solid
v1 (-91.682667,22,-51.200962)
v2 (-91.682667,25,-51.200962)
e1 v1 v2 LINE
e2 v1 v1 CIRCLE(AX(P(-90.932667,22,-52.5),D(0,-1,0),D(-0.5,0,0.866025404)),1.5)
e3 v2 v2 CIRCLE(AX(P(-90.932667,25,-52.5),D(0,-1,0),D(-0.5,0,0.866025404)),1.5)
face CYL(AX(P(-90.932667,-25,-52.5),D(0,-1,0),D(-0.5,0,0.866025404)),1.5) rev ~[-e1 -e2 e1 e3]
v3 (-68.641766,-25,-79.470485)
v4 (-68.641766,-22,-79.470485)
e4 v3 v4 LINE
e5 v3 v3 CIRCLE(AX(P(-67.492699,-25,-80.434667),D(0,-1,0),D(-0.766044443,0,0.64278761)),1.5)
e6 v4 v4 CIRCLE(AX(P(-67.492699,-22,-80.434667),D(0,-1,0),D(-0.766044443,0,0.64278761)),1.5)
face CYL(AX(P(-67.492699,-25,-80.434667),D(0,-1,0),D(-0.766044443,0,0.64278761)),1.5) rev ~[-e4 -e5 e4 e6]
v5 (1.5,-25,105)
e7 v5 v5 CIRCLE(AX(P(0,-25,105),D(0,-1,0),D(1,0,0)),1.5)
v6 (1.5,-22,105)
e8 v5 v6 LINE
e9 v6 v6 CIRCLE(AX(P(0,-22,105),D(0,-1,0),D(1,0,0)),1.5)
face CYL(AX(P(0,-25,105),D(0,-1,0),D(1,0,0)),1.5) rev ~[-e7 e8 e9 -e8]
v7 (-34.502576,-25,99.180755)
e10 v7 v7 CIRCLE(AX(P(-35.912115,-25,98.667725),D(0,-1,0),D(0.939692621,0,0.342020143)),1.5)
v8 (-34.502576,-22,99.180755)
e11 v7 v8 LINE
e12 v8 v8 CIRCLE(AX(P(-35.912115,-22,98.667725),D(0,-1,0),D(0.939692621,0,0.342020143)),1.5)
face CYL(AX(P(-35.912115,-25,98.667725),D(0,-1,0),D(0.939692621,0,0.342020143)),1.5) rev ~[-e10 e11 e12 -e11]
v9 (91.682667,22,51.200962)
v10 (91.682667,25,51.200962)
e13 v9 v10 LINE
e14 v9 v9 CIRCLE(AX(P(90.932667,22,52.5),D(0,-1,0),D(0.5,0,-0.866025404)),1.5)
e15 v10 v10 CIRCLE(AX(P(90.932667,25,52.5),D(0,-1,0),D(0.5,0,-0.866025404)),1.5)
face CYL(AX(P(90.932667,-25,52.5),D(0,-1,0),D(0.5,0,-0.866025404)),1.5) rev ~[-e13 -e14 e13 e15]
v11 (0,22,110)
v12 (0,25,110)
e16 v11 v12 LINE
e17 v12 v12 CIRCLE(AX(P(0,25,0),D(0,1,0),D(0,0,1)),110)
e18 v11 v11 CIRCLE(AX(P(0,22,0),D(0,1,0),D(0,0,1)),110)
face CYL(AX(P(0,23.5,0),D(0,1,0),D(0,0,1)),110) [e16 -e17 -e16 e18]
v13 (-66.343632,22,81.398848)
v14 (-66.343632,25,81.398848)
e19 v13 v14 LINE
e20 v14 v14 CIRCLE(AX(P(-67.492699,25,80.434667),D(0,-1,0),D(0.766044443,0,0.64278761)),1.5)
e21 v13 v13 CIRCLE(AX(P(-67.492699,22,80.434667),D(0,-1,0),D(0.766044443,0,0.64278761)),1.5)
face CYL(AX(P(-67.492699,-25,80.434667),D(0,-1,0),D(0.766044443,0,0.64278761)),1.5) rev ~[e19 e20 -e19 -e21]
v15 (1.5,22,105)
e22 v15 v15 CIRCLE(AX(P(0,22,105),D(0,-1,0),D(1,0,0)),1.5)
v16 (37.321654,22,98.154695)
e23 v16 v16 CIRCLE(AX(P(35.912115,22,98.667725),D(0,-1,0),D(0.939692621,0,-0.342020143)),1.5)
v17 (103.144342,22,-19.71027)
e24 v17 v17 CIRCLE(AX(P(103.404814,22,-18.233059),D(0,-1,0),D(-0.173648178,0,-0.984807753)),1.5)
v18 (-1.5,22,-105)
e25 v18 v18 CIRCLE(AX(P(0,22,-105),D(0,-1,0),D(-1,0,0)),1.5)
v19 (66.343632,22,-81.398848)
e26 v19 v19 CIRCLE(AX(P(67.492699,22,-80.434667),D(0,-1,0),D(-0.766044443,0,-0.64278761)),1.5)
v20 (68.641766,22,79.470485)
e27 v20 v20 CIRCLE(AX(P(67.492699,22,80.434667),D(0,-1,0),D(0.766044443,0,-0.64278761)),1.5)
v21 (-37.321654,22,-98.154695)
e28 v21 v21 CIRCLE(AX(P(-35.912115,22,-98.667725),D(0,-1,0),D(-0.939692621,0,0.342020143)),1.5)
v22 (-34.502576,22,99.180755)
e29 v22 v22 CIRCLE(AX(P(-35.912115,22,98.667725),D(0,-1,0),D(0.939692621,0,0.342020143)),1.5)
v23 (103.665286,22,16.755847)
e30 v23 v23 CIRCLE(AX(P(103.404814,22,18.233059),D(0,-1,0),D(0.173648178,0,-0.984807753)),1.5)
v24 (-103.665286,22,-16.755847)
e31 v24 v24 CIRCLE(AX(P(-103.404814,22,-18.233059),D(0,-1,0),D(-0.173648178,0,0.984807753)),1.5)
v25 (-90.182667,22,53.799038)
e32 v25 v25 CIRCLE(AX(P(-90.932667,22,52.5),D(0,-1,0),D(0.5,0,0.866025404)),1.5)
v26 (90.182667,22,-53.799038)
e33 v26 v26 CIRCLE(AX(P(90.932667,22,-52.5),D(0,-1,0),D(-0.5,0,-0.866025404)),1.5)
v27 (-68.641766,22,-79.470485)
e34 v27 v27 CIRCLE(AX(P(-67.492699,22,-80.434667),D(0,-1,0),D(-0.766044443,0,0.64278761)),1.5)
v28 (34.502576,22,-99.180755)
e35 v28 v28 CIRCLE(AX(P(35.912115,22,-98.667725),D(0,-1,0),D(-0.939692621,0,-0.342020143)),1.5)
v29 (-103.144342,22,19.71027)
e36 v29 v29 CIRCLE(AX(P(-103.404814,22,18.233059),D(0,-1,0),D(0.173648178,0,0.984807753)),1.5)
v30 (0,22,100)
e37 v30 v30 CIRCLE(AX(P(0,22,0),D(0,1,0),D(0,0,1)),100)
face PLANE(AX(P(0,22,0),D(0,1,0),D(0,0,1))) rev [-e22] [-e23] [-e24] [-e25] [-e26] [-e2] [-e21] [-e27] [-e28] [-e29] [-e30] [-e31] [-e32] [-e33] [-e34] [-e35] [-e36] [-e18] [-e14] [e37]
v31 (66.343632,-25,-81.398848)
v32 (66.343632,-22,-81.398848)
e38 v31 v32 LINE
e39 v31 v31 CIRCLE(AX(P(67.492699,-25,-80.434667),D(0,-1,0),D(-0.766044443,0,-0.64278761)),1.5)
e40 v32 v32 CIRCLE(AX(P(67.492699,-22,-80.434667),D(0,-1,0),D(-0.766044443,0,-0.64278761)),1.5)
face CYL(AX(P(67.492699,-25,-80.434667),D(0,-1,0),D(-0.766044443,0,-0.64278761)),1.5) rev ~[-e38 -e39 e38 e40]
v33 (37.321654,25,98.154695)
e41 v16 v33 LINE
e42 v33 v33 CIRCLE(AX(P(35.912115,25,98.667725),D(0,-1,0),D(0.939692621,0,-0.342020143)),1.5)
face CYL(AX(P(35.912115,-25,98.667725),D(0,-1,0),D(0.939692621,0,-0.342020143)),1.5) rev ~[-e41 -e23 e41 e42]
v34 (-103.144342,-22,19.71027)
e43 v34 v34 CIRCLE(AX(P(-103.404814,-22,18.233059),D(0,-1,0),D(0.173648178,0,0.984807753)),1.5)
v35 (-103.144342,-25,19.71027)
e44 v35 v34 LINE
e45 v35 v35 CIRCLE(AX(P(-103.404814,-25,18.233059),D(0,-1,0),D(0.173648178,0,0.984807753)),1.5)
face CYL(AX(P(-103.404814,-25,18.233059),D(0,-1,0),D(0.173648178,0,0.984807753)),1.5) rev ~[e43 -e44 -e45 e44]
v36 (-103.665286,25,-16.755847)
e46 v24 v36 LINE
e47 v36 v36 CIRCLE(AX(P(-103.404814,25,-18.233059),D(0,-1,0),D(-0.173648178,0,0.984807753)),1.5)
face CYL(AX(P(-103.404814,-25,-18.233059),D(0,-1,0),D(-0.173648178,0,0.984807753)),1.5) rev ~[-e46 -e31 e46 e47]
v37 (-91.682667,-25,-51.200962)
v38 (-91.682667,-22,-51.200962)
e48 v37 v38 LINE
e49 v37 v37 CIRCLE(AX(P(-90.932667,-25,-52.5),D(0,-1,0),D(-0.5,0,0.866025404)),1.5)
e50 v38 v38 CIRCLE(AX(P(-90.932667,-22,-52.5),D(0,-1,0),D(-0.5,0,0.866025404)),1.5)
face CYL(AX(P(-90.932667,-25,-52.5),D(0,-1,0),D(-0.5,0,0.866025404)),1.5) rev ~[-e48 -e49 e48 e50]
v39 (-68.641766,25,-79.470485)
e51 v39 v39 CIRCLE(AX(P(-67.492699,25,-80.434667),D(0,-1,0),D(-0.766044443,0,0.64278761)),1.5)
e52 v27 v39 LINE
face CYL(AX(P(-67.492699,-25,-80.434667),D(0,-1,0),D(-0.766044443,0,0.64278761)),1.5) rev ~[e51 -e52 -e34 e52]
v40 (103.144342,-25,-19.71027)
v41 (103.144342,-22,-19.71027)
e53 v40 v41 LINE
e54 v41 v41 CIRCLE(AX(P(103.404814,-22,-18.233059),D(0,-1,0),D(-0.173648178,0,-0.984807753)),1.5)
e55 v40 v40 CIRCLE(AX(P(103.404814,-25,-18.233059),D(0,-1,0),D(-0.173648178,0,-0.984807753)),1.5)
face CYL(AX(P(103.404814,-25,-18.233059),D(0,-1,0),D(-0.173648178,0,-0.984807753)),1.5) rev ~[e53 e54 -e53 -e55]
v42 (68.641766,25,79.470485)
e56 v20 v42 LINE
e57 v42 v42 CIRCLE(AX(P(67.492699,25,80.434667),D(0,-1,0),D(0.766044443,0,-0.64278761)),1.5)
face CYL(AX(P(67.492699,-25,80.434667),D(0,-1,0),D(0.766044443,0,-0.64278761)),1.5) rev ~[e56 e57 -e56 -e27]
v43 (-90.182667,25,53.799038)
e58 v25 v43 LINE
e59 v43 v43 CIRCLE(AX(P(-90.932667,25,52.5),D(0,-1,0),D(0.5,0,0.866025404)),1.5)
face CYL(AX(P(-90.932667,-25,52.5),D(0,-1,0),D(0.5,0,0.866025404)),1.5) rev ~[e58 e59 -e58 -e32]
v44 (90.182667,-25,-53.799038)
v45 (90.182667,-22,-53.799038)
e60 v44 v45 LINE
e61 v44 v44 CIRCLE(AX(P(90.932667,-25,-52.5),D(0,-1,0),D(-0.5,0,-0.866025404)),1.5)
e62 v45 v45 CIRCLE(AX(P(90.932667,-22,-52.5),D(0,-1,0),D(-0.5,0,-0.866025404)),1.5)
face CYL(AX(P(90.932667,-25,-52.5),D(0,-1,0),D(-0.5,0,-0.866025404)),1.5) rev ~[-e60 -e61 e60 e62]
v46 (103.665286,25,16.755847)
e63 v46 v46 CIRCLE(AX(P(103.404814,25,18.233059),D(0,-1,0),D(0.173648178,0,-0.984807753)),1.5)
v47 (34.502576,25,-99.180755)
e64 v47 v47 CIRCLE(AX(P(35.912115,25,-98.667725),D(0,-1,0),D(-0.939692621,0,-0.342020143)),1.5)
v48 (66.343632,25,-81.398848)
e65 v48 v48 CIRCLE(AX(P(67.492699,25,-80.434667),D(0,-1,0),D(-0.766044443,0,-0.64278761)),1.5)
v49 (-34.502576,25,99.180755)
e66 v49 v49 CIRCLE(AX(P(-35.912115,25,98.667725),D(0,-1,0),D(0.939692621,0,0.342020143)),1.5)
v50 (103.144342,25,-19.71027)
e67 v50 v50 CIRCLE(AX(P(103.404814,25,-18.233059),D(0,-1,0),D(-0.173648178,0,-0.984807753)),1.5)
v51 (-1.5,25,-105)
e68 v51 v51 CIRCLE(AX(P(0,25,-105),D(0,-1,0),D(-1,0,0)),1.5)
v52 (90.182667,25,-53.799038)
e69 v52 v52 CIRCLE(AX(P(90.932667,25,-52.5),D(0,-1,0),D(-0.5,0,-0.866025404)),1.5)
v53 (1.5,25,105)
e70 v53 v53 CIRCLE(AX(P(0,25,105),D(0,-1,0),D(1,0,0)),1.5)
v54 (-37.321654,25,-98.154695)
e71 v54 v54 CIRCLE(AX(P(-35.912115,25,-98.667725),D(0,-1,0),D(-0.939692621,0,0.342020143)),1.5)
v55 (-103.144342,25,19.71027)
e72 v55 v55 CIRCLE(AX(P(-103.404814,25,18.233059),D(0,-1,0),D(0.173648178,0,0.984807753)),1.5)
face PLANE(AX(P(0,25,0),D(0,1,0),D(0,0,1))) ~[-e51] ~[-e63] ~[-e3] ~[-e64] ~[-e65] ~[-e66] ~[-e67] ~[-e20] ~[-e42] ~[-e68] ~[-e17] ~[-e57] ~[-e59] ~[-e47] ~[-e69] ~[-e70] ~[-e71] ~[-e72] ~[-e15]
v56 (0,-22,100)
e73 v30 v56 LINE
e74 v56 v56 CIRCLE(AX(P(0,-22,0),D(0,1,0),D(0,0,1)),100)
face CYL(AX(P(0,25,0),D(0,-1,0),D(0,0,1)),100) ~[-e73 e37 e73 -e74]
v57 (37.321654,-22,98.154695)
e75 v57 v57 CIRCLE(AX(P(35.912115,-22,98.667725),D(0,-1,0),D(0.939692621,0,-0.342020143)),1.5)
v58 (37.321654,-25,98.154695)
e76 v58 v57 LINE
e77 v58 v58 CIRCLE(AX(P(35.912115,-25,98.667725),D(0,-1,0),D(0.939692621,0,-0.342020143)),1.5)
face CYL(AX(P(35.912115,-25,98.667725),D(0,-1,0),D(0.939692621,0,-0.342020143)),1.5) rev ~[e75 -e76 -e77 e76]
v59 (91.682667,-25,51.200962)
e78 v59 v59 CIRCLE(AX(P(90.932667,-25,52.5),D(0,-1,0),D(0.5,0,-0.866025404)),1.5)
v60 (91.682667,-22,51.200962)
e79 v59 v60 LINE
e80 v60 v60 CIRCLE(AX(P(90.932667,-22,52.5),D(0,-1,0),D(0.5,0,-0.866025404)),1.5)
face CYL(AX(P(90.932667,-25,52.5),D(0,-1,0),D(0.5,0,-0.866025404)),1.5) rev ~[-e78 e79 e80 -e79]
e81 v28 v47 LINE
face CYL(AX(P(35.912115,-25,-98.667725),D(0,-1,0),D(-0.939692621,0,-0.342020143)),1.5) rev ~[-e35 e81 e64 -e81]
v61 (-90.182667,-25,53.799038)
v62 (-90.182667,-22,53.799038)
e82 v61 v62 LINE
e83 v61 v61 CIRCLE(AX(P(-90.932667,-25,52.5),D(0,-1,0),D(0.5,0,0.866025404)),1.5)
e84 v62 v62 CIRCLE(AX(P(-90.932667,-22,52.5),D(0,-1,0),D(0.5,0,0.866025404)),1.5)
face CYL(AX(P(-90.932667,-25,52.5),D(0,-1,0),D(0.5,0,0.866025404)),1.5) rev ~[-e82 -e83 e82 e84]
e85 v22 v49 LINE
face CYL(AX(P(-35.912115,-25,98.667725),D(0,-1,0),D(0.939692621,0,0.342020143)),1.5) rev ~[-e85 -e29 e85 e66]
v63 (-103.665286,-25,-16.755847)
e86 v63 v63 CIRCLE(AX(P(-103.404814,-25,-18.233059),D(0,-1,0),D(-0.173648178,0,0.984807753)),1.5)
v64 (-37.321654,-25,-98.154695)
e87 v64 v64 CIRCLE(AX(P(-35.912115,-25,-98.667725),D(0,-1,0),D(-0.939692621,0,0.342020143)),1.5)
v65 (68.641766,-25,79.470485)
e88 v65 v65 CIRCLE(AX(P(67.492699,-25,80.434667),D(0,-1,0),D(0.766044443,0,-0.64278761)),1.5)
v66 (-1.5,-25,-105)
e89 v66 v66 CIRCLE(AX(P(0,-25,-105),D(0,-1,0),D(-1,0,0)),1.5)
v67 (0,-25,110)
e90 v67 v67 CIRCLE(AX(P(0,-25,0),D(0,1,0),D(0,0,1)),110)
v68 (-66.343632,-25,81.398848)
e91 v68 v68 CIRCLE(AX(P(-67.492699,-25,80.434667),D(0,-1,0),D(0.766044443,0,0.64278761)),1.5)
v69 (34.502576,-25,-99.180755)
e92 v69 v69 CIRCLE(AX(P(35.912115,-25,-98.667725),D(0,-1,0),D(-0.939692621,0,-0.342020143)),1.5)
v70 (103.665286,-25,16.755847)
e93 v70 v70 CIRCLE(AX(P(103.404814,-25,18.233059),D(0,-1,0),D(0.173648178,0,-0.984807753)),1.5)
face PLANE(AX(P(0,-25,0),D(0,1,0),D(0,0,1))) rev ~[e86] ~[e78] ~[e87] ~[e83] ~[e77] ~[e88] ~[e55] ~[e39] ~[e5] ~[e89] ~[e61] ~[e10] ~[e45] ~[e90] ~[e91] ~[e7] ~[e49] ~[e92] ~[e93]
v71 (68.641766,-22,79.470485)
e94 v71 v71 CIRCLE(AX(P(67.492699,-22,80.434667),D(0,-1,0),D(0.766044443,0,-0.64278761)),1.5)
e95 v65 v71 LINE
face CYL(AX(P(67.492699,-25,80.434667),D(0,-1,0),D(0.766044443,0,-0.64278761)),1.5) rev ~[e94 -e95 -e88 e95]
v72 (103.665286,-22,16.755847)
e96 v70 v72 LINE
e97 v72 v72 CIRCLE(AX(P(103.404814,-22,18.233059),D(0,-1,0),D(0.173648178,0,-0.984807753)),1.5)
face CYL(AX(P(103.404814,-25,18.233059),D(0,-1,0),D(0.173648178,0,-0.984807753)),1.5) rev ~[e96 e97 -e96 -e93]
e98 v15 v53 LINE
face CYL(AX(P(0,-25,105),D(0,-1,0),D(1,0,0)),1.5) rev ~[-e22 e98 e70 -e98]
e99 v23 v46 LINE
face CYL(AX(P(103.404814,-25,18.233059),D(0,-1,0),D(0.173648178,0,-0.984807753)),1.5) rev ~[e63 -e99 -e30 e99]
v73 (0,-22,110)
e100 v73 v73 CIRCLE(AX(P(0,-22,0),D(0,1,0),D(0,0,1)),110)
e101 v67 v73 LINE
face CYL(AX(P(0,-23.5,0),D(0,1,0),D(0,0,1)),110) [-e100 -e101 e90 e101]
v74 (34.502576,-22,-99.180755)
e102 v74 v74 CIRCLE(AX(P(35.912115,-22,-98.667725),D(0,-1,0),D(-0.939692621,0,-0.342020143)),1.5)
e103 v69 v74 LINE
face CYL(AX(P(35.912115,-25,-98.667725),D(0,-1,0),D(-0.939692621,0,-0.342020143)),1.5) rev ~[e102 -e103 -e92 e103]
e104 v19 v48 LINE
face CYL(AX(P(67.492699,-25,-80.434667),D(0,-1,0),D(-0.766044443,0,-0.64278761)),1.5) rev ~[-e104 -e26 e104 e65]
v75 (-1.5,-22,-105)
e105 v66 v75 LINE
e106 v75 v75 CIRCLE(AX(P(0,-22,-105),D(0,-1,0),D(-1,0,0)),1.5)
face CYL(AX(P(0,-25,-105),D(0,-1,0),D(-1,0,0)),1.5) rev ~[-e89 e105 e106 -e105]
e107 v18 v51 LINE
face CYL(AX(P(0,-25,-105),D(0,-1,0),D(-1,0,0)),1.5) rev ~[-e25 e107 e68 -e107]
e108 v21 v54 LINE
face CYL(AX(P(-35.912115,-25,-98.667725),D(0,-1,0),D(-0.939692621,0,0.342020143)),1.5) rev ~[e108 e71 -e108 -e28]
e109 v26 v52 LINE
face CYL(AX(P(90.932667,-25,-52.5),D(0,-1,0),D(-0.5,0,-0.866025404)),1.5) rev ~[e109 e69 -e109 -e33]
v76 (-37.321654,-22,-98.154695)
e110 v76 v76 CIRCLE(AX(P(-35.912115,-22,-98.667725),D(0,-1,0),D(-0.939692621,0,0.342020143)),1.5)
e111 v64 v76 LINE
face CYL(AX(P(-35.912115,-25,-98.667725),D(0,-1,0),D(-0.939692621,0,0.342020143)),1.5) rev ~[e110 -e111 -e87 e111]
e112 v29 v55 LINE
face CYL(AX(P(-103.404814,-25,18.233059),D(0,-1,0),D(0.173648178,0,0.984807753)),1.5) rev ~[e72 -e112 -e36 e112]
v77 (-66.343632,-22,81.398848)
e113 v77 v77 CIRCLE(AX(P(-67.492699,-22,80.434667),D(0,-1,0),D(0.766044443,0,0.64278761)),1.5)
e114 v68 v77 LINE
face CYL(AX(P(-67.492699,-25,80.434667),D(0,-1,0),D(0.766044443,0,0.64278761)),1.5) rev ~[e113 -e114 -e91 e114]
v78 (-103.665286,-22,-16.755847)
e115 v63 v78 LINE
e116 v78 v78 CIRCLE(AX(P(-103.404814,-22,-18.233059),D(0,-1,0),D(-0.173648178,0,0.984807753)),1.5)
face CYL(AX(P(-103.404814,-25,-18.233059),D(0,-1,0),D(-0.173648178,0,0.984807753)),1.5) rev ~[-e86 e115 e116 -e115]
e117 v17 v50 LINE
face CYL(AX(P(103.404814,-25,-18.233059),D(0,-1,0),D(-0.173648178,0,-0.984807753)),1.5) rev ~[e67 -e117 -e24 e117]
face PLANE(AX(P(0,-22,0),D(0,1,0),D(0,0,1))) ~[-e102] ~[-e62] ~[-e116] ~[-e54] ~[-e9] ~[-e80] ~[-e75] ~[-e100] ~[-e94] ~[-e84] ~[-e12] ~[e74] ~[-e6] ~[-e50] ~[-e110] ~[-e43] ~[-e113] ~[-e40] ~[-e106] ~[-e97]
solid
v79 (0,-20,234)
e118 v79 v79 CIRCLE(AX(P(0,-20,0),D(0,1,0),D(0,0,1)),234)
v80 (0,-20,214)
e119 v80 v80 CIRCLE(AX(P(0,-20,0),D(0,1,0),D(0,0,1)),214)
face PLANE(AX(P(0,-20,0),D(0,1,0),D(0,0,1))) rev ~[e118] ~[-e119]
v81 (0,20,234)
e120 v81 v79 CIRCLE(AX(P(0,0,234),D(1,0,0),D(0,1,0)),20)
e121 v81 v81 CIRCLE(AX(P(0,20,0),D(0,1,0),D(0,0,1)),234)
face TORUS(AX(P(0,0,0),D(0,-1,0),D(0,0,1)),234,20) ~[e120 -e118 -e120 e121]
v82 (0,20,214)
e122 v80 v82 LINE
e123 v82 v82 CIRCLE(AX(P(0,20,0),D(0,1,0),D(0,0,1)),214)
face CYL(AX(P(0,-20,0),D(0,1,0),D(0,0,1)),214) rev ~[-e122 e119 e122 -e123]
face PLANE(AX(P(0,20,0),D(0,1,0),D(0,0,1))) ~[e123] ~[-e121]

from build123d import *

# Parameters (mm, degrees)
F1_W            = 3
F1_H            = 10
F5_R            = 1.5
F6_DEPTH        = 50.001
F6_COPIES_COUNT = 18


# Not quite as in the source:
# - a pattern or mirror of a feature is missing from the dataset's text; its kind, count and spacing are read off the source's solid


with BuildPart() as f2:
    # F1 (on Right) → F2 (revolve)
    with BuildSketch(Plane.YZ):
        Polygon((25, 0), (25, 100), (22, 100), (-22, 100), (-25, 100), (-25, 0), align=None)
        with Locations((23.5, 105)):
            Rectangle(F1_W, F1_H)
        with Locations((-23.5, 105)):
            Rectangle(F1_W, F1_H)
    revolve(axis=Axis((0, 50.7838092744, 0), (0, 1, 0)))

    # F5 (on face) → F6 (cut, through all)
    with BuildSketch(Plane.XZ.offset(25)):
        with Locations((0, 105)):
            Circle(F5_R)
    f6 = extrude(amount=-F6_DEPTH, mode=Mode.SUBTRACT)

    # F6_copies: F6 ×18 about axis
    f6_copies_axis = Axis((0, 0, 0), (0, 1, 0))
    for i in range(1, F6_COPIES_COUNT):
        add(f6.rotate(f6_copies_axis, i * 360 / F6_COPIES_COUNT), mode=Mode.SUBTRACT)


with BuildPart() as f4:
    # F3 (on Right) → F4 (revolve)
    with BuildSketch(Plane.YZ):
        with BuildLine():
            Line((-20, 214), (20, 214))
            Line((20, 214), (20, 234))
            ThreePointArc((20, 234), (0, 254), (-20, 234))
            Line((-20, 234), (-20, 214))
        make_face()
    revolve(axis=Axis((0, 50.7838092744, 0), (0, 1, 0)))


solid = Compound([f2.part, f4.part])
